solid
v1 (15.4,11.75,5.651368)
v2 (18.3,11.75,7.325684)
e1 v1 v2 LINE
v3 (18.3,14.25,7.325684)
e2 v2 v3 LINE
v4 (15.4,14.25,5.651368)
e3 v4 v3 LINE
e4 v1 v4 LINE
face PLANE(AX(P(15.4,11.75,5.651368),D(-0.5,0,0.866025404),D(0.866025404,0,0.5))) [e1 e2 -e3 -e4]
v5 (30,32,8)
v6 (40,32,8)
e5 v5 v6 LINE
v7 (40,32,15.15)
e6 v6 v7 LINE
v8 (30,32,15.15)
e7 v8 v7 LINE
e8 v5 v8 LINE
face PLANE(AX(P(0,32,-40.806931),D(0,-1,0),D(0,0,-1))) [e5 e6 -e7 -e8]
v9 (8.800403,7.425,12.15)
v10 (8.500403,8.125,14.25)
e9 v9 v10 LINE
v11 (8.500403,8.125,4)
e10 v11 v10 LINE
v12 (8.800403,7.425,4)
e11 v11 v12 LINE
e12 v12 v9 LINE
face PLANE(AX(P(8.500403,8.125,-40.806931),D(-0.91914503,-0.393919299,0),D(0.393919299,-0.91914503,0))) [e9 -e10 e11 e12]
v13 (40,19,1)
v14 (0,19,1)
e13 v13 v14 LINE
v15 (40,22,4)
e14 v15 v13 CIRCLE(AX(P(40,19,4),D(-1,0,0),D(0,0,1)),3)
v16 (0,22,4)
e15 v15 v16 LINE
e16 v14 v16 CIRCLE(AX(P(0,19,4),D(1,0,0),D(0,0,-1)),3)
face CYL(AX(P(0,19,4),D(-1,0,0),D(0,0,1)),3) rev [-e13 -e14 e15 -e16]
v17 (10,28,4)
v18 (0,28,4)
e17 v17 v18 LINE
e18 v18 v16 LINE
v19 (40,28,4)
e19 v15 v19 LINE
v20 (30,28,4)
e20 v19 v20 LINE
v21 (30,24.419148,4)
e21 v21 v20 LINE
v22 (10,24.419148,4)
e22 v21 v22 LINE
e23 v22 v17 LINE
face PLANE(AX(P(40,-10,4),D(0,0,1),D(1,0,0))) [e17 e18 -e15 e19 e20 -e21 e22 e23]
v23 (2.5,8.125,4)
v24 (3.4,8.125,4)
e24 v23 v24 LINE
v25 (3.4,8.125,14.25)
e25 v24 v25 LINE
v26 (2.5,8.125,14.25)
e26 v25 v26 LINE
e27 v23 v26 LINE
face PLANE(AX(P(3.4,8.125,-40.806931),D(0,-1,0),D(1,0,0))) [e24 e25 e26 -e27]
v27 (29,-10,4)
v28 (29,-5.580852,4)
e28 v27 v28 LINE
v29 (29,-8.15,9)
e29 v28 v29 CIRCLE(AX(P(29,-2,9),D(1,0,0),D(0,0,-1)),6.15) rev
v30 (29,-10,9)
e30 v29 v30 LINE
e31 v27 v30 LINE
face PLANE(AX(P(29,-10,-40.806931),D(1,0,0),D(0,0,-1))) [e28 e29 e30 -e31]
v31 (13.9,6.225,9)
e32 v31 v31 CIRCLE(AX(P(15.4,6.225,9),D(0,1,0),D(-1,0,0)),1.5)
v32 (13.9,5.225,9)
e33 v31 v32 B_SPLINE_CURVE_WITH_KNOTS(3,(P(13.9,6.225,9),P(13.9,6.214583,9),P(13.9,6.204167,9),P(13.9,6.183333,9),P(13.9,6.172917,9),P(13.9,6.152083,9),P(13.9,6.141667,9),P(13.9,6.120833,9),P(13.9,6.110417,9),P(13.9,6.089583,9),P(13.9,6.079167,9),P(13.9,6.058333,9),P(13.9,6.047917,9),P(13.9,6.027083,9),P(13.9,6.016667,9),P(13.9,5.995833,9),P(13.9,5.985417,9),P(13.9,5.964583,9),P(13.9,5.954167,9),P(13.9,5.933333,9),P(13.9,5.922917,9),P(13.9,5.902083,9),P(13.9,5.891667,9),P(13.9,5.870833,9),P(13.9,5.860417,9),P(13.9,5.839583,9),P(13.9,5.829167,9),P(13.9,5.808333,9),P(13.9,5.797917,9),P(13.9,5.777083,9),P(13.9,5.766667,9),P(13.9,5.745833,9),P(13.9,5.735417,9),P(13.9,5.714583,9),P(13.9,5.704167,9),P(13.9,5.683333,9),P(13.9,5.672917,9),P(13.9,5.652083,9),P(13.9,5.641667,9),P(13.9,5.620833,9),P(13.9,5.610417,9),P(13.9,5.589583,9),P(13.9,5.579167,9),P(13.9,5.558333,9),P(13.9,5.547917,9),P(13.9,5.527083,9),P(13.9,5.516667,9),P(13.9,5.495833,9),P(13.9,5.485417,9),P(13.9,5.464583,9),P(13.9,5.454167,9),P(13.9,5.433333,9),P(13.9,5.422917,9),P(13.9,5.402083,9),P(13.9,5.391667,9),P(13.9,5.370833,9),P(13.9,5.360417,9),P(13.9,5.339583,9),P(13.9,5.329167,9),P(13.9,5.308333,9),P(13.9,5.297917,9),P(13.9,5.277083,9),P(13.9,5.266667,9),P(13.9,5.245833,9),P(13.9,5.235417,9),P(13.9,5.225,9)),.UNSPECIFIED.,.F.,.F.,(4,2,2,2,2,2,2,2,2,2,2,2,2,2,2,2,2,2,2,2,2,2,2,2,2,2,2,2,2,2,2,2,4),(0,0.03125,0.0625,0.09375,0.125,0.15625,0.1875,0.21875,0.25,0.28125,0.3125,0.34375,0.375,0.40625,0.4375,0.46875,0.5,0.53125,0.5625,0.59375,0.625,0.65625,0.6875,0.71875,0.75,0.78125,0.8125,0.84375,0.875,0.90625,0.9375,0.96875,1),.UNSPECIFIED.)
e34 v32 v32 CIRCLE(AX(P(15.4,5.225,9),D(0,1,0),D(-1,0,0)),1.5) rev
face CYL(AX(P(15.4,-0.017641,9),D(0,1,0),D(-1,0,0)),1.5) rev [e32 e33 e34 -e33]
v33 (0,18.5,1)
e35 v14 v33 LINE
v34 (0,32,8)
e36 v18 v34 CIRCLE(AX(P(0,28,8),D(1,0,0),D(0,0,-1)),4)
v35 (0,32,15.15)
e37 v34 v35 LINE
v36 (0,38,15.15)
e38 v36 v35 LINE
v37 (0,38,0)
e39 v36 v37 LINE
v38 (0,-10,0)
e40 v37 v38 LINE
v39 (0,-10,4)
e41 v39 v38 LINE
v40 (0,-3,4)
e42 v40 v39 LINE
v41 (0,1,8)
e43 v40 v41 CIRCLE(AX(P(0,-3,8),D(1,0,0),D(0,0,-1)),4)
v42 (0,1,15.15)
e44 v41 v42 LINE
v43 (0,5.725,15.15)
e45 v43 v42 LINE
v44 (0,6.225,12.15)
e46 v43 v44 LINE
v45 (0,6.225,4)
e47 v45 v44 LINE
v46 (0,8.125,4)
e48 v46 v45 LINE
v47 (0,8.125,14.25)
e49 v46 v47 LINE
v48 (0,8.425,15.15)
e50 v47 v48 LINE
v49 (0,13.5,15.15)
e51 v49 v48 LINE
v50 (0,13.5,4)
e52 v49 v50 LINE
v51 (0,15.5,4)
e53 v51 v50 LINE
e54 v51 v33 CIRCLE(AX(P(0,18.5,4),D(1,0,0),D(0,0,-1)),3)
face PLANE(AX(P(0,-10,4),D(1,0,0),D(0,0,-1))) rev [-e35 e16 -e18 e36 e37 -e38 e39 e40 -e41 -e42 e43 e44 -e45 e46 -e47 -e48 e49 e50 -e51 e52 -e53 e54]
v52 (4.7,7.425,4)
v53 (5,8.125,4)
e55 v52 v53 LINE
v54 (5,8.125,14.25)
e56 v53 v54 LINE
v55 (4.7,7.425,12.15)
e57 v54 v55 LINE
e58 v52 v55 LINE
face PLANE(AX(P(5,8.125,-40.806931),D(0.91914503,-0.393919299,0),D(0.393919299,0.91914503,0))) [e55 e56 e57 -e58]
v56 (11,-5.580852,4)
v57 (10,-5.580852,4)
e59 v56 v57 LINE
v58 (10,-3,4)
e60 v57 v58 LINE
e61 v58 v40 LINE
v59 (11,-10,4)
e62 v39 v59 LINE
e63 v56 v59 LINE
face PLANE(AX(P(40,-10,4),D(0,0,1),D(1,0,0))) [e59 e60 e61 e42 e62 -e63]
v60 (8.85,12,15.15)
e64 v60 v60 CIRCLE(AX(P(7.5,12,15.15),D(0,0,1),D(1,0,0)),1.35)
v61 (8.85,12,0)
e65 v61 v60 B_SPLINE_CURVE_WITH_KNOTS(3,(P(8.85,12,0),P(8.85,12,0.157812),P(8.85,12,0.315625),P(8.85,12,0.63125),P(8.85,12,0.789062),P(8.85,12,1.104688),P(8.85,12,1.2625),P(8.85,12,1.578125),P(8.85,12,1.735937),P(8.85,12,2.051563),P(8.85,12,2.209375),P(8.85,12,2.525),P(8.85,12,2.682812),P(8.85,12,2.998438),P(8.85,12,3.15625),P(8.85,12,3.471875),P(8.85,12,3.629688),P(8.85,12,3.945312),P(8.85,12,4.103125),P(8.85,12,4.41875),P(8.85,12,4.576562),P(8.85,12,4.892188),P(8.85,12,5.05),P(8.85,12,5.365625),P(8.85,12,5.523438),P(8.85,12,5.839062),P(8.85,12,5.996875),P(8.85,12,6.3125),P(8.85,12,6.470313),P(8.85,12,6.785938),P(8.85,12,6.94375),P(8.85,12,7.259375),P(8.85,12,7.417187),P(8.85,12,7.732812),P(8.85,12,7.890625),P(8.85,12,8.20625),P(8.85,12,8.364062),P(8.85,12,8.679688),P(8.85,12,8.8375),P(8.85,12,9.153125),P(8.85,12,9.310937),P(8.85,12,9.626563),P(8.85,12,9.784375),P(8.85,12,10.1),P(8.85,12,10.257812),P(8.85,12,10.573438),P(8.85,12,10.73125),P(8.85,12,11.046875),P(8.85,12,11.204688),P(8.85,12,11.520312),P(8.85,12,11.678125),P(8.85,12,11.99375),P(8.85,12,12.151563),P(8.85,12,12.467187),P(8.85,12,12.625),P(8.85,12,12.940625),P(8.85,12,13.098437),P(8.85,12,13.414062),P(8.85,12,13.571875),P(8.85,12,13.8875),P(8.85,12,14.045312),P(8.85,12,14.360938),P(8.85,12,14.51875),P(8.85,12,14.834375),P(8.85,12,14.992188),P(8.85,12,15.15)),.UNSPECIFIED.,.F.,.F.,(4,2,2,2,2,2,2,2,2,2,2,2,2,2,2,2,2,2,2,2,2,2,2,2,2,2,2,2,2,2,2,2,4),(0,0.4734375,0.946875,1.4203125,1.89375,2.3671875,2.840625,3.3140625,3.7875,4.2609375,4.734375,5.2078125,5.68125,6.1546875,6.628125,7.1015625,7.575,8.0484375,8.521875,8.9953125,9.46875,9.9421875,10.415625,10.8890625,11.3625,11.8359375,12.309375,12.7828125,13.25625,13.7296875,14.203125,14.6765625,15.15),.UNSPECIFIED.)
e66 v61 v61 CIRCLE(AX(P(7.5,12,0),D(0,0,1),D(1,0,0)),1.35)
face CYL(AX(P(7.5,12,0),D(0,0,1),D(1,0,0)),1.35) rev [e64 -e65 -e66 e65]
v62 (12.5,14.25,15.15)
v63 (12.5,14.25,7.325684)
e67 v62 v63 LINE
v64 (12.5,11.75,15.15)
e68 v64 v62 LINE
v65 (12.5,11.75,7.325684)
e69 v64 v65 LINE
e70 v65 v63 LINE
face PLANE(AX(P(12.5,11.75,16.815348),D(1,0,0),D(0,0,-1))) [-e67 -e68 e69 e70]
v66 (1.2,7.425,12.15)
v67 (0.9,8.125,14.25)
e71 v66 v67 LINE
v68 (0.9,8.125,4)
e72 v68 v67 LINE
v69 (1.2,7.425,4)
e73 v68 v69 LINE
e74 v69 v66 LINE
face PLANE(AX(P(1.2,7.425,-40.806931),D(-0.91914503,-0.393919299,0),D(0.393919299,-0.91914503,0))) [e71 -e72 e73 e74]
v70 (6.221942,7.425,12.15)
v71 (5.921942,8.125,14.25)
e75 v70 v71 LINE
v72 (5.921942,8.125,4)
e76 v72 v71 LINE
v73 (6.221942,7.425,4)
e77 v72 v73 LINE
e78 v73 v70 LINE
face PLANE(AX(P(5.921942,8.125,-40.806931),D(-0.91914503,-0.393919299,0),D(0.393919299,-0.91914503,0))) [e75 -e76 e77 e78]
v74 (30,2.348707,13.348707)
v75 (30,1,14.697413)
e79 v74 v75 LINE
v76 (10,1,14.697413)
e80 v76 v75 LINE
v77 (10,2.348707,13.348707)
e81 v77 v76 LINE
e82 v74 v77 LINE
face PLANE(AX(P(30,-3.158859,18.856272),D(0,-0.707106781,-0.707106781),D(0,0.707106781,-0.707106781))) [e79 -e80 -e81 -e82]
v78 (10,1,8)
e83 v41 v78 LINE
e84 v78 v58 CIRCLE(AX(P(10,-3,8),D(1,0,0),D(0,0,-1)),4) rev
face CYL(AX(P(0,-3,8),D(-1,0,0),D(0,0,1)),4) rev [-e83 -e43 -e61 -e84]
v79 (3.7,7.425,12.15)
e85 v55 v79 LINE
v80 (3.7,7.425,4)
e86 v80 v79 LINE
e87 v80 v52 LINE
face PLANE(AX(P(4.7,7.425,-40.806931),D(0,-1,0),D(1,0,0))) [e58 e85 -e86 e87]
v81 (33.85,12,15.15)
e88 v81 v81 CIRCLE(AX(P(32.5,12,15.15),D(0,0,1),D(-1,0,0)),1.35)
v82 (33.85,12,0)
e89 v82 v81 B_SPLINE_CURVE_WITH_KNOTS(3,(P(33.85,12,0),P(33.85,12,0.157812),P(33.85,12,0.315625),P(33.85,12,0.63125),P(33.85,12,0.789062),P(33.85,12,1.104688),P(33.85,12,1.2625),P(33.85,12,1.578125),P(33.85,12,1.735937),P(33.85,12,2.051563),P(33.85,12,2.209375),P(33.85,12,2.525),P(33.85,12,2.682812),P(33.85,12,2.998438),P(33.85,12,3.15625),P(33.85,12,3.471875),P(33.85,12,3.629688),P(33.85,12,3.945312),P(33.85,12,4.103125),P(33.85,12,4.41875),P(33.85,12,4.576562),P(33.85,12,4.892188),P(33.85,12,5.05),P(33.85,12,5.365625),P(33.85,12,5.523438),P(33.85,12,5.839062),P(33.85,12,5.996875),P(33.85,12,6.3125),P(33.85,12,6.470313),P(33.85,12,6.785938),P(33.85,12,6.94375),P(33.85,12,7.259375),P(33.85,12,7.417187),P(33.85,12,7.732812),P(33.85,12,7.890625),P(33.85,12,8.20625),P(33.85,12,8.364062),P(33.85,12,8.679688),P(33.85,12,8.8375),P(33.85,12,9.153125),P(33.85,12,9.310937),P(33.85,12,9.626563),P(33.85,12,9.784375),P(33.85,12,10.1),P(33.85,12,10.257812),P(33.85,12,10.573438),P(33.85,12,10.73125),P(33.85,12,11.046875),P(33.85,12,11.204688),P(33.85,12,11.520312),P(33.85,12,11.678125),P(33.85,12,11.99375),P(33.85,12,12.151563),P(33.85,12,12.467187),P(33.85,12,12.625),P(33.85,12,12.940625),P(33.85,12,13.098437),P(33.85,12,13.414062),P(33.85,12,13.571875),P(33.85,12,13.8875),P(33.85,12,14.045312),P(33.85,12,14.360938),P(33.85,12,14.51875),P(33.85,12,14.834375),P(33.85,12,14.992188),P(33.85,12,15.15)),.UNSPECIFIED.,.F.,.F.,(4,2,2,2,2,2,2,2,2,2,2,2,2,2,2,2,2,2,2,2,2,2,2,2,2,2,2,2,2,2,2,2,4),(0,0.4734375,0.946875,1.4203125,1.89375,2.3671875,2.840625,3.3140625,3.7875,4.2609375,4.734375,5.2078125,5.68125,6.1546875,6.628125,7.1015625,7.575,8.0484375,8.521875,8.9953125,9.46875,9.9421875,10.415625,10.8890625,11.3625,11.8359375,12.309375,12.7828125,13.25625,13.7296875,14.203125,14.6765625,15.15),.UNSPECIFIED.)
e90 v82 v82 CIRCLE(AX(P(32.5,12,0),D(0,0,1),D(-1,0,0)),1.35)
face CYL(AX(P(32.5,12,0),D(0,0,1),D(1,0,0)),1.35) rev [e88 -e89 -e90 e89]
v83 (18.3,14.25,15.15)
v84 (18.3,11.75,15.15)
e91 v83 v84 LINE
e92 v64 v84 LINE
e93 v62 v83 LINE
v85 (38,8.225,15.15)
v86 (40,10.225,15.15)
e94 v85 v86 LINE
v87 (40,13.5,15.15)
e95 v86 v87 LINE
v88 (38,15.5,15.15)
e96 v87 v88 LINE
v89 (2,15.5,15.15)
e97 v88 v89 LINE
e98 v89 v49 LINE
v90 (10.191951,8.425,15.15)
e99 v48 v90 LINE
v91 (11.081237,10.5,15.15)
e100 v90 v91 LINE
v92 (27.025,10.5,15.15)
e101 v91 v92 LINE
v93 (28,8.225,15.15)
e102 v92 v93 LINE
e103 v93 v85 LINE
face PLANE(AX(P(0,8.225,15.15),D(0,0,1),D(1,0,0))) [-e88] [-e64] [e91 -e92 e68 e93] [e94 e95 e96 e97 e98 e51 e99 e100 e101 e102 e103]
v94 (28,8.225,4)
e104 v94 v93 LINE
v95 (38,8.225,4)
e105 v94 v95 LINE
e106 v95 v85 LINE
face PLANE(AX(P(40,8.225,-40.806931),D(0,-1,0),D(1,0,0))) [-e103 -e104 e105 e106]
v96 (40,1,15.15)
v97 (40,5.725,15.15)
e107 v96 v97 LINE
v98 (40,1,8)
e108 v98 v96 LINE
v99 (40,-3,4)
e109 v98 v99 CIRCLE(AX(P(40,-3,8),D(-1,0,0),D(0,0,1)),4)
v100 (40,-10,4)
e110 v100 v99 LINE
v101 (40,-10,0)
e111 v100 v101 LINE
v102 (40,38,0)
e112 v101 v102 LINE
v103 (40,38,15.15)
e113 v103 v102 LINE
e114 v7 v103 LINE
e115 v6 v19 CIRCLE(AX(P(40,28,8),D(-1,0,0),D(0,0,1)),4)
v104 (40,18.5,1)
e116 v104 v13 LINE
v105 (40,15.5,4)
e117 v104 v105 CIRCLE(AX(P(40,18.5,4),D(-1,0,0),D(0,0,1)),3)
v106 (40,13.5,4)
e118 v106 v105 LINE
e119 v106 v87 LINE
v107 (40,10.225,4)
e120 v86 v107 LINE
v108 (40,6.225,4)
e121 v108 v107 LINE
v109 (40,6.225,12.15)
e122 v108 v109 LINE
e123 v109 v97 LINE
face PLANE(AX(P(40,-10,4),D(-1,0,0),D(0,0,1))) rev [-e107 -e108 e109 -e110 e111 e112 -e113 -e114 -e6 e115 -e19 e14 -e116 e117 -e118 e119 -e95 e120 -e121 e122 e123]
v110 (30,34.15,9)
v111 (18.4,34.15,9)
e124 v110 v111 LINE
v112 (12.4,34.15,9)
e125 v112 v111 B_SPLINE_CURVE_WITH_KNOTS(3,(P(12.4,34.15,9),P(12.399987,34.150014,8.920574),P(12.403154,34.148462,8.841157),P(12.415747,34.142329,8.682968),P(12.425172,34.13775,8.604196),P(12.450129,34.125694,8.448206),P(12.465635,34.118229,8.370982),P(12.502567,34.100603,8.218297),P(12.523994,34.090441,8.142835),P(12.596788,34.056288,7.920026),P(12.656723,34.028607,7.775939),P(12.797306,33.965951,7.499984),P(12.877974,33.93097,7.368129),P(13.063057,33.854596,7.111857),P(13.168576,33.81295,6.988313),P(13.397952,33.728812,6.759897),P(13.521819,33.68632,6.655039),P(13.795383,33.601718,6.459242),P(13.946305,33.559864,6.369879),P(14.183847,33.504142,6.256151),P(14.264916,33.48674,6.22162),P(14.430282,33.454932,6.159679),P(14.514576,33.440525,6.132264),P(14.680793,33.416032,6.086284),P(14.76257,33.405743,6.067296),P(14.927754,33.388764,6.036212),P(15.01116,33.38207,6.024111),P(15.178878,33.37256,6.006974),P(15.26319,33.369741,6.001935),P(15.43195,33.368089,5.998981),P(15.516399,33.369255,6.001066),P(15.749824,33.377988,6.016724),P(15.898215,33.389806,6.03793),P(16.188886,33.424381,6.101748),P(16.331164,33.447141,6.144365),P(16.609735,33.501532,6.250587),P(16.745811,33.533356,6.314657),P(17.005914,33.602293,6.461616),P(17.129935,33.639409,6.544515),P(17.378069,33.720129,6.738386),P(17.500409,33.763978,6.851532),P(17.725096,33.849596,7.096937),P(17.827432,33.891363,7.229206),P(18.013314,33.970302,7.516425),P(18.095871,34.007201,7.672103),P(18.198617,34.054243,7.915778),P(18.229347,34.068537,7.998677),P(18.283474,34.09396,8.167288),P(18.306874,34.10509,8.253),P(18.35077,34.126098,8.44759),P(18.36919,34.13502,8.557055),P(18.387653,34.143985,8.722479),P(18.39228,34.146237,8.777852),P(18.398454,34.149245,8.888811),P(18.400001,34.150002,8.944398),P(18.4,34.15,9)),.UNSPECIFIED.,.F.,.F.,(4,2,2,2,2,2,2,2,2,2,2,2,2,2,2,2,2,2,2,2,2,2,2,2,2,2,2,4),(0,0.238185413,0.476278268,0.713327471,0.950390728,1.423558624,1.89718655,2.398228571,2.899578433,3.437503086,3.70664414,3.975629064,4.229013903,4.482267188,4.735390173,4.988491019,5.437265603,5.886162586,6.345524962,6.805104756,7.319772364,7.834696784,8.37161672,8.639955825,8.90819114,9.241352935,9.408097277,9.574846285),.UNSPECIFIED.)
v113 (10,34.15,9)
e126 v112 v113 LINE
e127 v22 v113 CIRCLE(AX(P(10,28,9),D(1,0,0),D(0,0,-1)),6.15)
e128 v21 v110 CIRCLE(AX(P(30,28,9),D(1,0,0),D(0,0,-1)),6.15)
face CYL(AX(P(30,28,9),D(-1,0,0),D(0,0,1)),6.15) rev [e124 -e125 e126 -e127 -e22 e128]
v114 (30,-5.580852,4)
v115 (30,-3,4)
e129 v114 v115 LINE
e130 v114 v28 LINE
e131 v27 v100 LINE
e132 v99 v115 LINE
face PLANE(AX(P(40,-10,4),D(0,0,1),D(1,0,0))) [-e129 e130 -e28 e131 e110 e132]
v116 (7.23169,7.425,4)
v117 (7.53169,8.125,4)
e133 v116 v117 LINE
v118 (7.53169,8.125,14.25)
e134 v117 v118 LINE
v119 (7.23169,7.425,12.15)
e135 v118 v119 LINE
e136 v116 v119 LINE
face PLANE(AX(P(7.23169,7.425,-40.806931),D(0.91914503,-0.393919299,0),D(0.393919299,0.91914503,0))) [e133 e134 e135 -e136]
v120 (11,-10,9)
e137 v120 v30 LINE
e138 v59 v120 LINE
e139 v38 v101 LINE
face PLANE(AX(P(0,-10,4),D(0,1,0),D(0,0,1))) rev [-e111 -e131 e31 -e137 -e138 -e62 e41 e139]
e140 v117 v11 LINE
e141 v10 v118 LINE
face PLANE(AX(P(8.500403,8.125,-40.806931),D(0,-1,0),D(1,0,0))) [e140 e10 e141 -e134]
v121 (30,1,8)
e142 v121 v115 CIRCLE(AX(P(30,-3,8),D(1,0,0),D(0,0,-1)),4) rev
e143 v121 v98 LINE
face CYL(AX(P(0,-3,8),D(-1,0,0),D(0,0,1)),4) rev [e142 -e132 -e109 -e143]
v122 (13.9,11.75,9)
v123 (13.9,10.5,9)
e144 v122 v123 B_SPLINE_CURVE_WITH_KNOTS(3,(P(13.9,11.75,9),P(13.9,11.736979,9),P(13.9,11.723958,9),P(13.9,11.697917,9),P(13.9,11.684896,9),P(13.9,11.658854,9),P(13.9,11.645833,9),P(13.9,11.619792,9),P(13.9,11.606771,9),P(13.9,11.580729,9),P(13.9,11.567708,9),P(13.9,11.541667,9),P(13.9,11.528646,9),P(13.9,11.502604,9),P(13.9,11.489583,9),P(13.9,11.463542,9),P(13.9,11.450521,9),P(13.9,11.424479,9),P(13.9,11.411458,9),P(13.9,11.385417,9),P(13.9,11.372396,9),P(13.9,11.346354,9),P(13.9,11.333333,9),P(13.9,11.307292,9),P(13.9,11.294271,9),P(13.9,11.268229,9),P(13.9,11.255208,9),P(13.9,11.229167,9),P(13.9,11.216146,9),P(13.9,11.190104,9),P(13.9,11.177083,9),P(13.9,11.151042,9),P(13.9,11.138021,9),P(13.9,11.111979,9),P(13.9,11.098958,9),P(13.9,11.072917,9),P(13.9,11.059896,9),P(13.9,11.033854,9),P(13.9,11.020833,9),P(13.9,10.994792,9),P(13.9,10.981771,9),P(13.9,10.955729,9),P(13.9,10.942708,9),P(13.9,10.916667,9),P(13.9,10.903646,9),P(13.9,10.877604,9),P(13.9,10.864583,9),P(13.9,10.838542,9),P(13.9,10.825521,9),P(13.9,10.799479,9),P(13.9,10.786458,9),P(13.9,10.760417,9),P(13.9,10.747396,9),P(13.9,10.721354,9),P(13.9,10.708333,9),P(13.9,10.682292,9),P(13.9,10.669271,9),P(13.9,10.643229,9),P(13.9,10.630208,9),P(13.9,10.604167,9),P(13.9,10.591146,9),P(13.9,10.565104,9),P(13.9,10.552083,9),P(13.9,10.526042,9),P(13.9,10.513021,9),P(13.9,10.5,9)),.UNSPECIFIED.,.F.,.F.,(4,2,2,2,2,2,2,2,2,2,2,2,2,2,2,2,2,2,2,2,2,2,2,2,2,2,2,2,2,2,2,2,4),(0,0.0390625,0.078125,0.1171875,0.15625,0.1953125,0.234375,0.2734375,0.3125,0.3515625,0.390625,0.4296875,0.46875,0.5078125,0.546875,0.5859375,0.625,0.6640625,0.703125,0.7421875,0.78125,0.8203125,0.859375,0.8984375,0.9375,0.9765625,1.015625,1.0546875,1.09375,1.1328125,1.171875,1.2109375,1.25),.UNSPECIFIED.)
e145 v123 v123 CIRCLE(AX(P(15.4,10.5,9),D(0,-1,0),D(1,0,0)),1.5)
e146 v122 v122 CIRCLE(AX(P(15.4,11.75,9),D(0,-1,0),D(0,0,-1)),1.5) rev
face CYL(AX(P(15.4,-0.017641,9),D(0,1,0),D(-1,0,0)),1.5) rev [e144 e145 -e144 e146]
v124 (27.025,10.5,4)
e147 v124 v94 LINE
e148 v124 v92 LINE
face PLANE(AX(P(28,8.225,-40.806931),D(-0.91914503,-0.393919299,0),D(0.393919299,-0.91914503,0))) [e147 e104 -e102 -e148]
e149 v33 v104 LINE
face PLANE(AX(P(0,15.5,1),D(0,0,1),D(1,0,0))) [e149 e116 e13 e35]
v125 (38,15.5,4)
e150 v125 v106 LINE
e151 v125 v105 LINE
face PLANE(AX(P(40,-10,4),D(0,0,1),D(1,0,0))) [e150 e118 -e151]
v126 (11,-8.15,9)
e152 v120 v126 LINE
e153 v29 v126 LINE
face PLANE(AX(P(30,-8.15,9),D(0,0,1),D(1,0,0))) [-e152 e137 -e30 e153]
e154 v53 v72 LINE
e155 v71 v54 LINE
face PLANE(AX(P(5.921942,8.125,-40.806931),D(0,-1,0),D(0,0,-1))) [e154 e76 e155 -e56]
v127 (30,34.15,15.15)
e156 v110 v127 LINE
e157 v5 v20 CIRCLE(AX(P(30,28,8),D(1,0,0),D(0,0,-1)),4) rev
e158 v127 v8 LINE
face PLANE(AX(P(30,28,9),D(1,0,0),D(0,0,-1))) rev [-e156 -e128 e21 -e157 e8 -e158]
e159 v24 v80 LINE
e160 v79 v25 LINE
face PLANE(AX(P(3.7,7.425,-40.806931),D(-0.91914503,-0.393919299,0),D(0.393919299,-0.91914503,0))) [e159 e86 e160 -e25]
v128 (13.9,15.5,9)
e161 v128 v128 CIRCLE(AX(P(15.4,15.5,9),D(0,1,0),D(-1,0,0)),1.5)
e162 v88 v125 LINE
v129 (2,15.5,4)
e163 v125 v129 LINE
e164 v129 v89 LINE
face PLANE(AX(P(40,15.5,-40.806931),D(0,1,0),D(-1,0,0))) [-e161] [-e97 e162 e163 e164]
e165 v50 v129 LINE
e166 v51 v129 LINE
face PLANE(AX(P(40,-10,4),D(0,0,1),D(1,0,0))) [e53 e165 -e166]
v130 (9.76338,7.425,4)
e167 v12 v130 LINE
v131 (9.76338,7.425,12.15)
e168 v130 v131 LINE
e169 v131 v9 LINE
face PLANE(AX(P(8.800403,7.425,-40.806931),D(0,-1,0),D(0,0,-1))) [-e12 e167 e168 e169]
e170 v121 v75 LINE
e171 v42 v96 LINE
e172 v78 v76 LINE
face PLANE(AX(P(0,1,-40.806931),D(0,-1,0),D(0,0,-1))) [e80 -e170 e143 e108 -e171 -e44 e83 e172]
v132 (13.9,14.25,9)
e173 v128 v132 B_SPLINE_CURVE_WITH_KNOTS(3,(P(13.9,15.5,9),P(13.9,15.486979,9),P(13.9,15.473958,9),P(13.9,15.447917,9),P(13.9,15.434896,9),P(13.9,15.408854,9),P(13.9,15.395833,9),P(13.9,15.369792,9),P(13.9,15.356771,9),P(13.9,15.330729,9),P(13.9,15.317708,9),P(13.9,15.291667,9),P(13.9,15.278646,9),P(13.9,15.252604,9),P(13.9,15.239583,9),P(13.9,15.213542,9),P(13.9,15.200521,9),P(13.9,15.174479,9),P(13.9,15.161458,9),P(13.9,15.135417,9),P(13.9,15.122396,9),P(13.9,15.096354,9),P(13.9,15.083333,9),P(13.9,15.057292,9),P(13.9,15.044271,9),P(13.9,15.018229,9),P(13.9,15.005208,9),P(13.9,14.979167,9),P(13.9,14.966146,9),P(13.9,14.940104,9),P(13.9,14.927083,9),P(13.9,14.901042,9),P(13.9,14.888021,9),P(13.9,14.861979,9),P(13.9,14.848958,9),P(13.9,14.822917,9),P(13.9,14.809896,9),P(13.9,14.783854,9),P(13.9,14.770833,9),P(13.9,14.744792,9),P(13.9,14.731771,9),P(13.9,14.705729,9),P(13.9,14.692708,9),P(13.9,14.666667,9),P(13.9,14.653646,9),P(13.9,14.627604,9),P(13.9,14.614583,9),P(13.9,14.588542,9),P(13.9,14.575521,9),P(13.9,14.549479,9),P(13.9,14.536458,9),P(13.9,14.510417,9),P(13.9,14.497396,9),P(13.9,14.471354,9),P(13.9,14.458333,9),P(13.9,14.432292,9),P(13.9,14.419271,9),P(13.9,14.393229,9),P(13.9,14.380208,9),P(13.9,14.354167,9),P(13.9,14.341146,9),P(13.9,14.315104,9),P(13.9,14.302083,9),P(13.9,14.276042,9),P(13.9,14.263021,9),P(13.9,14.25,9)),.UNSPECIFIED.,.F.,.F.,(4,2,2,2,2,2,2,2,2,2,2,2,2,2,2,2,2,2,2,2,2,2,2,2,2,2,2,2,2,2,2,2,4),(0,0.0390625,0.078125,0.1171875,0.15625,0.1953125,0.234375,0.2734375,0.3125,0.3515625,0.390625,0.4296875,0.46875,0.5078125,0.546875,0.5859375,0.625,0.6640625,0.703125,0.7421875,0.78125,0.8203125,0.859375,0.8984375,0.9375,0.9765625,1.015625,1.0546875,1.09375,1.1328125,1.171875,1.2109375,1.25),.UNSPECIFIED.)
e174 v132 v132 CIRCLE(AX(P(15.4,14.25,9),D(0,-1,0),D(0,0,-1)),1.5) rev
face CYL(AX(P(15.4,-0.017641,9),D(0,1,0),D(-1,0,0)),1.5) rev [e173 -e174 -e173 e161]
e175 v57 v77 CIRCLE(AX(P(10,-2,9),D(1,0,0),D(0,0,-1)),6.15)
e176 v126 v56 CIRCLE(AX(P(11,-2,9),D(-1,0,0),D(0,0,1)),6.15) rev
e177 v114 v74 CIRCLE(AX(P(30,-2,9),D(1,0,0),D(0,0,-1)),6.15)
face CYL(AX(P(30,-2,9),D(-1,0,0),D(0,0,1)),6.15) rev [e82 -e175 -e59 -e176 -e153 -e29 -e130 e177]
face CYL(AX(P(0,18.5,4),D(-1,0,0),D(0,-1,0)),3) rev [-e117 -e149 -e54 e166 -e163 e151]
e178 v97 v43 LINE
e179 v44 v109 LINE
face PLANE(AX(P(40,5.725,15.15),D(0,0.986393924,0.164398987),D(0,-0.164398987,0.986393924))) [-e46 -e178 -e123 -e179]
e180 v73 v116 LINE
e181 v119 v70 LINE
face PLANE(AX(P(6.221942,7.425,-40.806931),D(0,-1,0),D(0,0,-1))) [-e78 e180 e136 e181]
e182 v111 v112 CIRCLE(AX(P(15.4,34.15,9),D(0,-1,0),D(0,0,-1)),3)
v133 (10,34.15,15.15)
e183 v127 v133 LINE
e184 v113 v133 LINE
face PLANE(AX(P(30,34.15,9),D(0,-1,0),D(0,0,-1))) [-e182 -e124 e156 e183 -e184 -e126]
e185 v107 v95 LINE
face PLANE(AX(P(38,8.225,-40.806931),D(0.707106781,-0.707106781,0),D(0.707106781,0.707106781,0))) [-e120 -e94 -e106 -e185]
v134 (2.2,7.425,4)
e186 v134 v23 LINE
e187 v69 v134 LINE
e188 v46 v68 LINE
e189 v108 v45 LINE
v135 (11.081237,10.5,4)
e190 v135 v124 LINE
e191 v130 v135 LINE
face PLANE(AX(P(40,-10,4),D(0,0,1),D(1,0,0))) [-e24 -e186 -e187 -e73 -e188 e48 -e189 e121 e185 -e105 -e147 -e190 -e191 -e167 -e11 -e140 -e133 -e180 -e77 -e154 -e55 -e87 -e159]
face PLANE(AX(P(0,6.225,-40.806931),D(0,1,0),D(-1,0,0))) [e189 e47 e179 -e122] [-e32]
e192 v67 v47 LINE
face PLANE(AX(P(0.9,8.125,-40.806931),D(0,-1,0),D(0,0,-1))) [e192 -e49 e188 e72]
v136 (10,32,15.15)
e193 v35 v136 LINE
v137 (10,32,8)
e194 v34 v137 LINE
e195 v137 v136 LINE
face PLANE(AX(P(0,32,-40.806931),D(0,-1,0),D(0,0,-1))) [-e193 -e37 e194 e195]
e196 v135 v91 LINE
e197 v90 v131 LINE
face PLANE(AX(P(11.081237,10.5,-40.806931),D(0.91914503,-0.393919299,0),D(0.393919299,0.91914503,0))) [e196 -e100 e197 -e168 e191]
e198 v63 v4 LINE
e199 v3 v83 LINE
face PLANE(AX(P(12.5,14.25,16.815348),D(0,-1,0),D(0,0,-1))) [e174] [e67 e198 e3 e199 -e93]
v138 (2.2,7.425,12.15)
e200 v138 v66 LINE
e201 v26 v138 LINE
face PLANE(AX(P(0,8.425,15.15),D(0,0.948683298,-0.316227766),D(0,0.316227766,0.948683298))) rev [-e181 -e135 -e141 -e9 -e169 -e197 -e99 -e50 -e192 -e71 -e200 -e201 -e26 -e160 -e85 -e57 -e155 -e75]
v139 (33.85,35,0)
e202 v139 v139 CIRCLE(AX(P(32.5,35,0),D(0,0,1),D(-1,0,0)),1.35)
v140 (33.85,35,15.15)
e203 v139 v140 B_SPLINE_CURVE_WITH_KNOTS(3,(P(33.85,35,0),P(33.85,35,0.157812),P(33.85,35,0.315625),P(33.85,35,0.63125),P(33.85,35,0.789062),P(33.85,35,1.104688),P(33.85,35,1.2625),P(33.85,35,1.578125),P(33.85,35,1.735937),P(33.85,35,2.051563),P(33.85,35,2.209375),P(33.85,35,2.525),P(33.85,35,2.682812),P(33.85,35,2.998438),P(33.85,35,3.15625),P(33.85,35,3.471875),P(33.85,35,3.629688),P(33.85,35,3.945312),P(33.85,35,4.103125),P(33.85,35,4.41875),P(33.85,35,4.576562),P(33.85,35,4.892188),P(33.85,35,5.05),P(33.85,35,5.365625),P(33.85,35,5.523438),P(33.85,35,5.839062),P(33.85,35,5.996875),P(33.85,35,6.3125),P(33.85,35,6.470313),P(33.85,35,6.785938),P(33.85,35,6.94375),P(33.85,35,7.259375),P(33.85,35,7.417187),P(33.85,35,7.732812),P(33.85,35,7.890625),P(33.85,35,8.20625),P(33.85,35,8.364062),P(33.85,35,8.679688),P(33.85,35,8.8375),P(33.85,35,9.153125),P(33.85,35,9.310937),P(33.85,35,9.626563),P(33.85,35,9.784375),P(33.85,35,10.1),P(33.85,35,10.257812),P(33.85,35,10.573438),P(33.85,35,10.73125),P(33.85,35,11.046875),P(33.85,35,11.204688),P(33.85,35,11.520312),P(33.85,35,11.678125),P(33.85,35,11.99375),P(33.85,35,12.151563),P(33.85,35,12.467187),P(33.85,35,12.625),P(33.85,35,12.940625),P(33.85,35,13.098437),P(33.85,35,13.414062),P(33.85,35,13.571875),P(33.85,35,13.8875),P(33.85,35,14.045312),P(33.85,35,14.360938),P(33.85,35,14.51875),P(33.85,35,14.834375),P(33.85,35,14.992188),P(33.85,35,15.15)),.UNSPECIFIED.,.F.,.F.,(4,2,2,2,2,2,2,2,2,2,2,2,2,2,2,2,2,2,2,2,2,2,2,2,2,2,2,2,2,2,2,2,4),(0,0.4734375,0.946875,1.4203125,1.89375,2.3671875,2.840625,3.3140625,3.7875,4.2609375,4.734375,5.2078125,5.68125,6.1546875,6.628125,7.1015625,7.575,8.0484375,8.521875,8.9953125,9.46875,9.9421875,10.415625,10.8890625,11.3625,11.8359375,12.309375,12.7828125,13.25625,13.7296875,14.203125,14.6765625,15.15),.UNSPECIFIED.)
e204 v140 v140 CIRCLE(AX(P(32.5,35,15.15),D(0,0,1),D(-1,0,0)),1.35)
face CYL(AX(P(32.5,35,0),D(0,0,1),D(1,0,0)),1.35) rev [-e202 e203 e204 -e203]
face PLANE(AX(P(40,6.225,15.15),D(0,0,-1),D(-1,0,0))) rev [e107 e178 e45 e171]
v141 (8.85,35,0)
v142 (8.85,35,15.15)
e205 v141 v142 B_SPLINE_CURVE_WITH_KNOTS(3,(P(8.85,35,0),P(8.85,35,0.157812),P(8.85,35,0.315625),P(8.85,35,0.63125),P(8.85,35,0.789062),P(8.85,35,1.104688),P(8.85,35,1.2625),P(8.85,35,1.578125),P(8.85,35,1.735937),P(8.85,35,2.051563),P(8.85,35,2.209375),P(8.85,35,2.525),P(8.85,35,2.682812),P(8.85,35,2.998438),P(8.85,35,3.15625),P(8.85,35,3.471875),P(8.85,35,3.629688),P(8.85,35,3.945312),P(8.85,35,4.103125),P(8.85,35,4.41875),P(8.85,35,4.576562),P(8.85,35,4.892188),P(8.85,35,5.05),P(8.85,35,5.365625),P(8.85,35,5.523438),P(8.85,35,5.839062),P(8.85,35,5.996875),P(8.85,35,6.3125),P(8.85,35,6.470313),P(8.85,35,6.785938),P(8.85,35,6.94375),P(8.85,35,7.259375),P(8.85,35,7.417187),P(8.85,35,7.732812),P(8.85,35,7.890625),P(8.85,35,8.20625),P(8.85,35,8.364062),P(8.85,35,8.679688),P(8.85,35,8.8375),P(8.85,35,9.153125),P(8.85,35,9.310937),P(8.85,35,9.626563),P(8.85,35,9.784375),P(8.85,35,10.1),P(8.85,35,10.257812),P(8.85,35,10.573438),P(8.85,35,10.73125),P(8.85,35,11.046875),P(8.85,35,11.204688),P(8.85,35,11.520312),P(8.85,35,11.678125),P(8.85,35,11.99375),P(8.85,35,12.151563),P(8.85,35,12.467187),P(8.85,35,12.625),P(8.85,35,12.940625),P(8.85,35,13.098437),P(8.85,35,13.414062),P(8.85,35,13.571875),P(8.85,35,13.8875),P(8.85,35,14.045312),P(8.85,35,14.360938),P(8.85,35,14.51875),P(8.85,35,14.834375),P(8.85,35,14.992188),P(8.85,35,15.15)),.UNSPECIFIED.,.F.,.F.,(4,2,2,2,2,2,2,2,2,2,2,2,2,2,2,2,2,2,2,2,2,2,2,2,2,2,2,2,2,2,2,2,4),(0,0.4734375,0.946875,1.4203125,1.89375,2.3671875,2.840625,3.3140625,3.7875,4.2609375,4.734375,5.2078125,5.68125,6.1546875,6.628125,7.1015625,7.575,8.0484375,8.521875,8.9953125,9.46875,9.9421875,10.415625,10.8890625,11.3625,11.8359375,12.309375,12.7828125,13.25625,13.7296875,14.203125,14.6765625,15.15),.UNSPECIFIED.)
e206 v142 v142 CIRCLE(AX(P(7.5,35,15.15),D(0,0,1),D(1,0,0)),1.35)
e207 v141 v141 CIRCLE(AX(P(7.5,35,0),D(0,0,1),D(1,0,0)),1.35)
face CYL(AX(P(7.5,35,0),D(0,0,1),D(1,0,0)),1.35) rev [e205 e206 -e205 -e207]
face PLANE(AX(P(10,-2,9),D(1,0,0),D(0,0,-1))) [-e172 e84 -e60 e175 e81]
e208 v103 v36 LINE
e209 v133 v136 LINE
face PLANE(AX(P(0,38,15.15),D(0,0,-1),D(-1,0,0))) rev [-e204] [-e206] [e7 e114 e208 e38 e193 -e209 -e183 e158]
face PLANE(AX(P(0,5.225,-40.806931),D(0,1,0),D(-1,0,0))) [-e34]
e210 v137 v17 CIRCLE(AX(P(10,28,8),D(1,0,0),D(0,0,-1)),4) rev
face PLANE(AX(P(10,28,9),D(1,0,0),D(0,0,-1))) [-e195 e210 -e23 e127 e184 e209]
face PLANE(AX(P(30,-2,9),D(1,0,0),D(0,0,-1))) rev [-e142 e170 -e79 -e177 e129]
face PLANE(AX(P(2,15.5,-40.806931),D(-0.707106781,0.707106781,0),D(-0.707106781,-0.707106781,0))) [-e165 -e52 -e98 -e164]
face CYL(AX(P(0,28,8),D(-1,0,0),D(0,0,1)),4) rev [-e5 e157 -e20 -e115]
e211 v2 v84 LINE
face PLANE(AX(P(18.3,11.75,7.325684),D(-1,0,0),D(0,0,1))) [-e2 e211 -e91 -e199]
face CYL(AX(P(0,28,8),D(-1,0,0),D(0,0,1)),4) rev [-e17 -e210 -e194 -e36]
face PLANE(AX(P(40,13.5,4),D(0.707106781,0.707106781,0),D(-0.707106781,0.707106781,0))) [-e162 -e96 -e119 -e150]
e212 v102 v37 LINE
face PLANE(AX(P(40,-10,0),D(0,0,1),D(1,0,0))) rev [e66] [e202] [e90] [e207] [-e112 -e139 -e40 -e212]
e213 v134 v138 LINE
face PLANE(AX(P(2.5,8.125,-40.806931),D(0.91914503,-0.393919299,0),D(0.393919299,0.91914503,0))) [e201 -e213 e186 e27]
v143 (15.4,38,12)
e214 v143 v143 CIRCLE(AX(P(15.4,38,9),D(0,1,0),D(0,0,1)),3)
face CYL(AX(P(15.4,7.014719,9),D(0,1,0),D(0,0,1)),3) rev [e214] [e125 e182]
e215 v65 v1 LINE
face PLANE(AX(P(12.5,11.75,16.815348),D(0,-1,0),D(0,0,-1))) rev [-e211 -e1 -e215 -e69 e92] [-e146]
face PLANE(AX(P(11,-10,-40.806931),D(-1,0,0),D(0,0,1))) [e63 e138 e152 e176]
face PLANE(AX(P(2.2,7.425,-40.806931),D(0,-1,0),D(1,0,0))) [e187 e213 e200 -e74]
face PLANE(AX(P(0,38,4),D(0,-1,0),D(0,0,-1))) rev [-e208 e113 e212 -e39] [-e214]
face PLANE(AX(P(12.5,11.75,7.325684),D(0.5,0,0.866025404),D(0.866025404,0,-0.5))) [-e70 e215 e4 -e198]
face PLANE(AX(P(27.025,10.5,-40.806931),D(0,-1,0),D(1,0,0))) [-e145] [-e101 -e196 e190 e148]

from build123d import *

# Parameters (mm, degrees)
SKETCH1_W                = 40
SKETCH1_H                = 48
BOSS_EXTRUDE1_DEPTH      = 4
BOSS_EXTRUDE2_DEPTH      = 11.15
BOSS_EXTRUDE2_DEPTH_BACK = 4
SKETCH5_W                = 40
SKETCH5_H                = 5.225
SKETCH5_W_2              = 18
SKETCH5_H_2              = 5
SKETCH5_H_3              = 6
FILLET1_R                = 4
SKETCH6_R                = 1.35
CUT_EXTRUDE4_DEPTH       = 58.214705278
CHAMFER2_SIZE            = 2
SKETCH7_W                = 40
SKETCH7_H                = 6.5
CUT_EXTRUDE5_DEPTH       = 3
FILLET2_R                = 3
CHAMFER3_SIZE            = 3
CHAMFER3_SIZE2           = 1
CHAMFER4_SIZE            = 3
CHAMFER4_SIZE2           = 0.5
CUT_EXTRUDE6_DEPTH       = 10
CUT_EXTRUDE6_DEPTH_BACK  = 10
CUT_EXTRUDE8_REACH       = 66.292
SKETCH12_R               = 3
SKETCH13_R               = 1.5
CUT_EXTRUDE10_DEPTH      = 10.275
CUT_EXTRUDE7_DEPTH       = 1.25
CUT_EXTRUDE7_DEPTH_BACK  = 1.25


with BuildPart() as part:
    # Sketch1 → Boss-Extrude1 (new body)
    with BuildSketch(Plane.XY):
        with Locations((20, 14)):
            Rectangle(SKETCH1_W, SKETCH1_H)
    extrude(amount=BOSS_EXTRUDE1_DEPTH)

    # Sketch5 → Boss-Extrude2 (add, two sides: drawn at the far end of the back side and taken through both)
    with BuildSketch(Plane.XY.offset(4).offset(-BOSS_EXTRUDE2_DEPTH_BACK)):
        Polygon((0.9, 8.125), (0, 8.125), (0, 15.5), (40, 15.5), (40, 8.225), (28, 8.225), (27.025, 10.5), (11.081237185, 10.5), (9.763380042, 7.425), (8.800403155, 7.425), (8.500403155, 8.125), (7.531690021, 8.125), (7.231690021, 7.425), (6.221941609, 7.425), (5.921941609, 8.125), (5, 8.125), (4.7, 7.425), (3.7, 7.425), (3.4, 8.125), (2.5, 8.125), (2.2, 7.425), (1.2, 7.425), align=None)
        with Locations((20, 3.6125)):
            Rectangle(SKETCH5_W, SKETCH5_H)
        with Locations((20, -7.5)):
            Rectangle(SKETCH5_W_2, SKETCH5_H_2)
        with Locations((20, 35)):
            Rectangle(SKETCH5_W, SKETCH5_H_3)
    extrude(amount=BOSS_EXTRUDE2_DEPTH + BOSS_EXTRUDE2_DEPTH_BACK)

    # Fillet1
    fillet1_edges = [part.edges().sort_by_distance(p)[0] for p in [
        (20, 1, 4),
        (20, 32, 4),
    ]]
    fillet(fillet1_edges, radius=FILLET1_R)

    # Sketch6 → Cut-Extrude4 (cut, through all)
    with BuildSketch(Plane.XY.offset(15.15)):
        with Locations((7.5, 35)):
            Circle(SKETCH6_R)
        with Locations((7.5, 12)):
            Circle(SKETCH6_R)
        with Locations((32.5, 35)):
            Circle(SKETCH6_R)
        with Locations((32.5, 12)):
            Circle(SKETCH6_R)
    extrude(amount=-CUT_EXTRUDE4_DEPTH, mode=Mode.SUBTRACT)

    # Chamfer2
    chamfer2_edges = [part.edges().sort_by_distance(p)[0] for p in [
        (40, 8.225, 9.575),
        (0, 15.5, 9.575),
        (40, 15.5, 9.575),
    ]]
    chamfer(chamfer2_edges, length=CHAMFER2_SIZE)

    # Sketch7 → Cut-Extrude5 (cut)
    with BuildSketch(Plane.XY.offset(4)):
        with Locations((20, 18.75)):
            Rectangle(SKETCH7_W, SKETCH7_H)
    extrude(amount=-CUT_EXTRUDE5_DEPTH, mode=Mode.SUBTRACT)

    # Fillet2
    fillet2_edges = [part.edges().sort_by_distance(p)[0] for p in [
        (20, 15.5, 1),
        (20, 22, 1),
    ]]
    fillet(fillet2_edges, radius=FILLET2_R - 0.0001)  # a hair under: the kernel refuses the full size

    # Chamfer3
    chamfer3_edges = [part.edges().sort_by_distance(p)[0] for p in [
        (4.2, 7.425, 15.15),
    ]]
    chamfer3_side = [part.faces().sort_by_distance(p)[0] for p in [
        (4.2, 7.425, 9.575),
    ]]
    chamfer(chamfer3_edges, length=CHAMFER3_SIZE, length2=CHAMFER3_SIZE2, reference=chamfer3_side[0])

    # Chamfer4
    chamfer4_edges = [part.edges().sort_by_distance(p)[0] for p in [
        (20, 6.225, 15.15),
    ]]
    chamfer4_side = [part.faces().sort_by_distance(p)[0] for p in [
        (20, 6.225, 9.575),
    ]]
    chamfer(chamfer4_edges, length=CHAMFER4_SIZE, length2=CHAMFER4_SIZE2, reference=chamfer4_side[0])

    # Sketch8 → Cut-Extrude6 (cut, two sides: drawn at the far end of the back side and taken through both)
    with BuildSketch(Plane(origin=(20, 0, 0), x_dir=(0, 0, -1), z_dir=(1, 0, 0)).offset(-CUT_EXTRUDE6_DEPTH_BACK)):
        with BuildLine():
            Line((-9, 34.15), (-18.856272107, 34.15))
            Line((-18.856272107, 34.15), (-18.856272107, 21.85))
            Line((-18.856272107, 21.85), (-9, 21.85))
            ThreePointArc((-9, 21.85), (-2.85, 28), (-9, 34.15))
        make_face()
        with BuildLine():
            Line((-18.856272107, -10.437196649), (-18.856272107, -3.158858698))
            Line((-18.856272107, -3.158858698), (-13.348706704, 2.348706704))
            ThreePointArc((-13.348706704, 2.348706704), (-3.318140875, 0.353503109), (-9, -8.15))
            Line((-9, -8.15), (-9, -10.437196649))
            Line((-9, -10.437196649), (-18.856272107, -10.437196649))
        make_face()
    extrude(amount=CUT_EXTRUDE6_DEPTH + CUT_EXTRUDE6_DEPTH_BACK, mode=Mode.SUBTRACT)

    # Cut-Extrude8: up to this face of the body (flat: up to its plane)
    cut_extrude8_end = Plane(part.part.faces().sort_by_distance((20, 15.5, 9.574944444))[0])
    # Sketch12 → Cut-Extrude8 (cut, up to the picked face)
    with BuildSketch(Plane(origin=(0, 38, 0), x_dir=(1, 0, 0), z_dir=(0, 1, 0)), mode=Mode.PRIVATE) as cut_extrude8_sk1:
        with Locations(Location((15.4, -9, 0), (0, 0, 270))):
            Circle(SKETCH12_R)
    cut_extrude8_tool1 = split(extrude(cut_extrude8_sk1.sketch, amount=-CUT_EXTRUDE8_REACH, mode=Mode.PRIVATE), bisect_by=cut_extrude8_end, keep=Keep.BOTH, mode=Mode.PRIVATE)
    add(cut_extrude8_tool1.solids().sort_by(Axis((15.4, 38, 9), (0, -1, 0)))[0], mode=Mode.SUBTRACT)

    # Sketch13 → Cut-Extrude10 (cut)
    with BuildSketch(Plane(origin=(0, 15.5, 0), x_dir=(1, 0, 0), z_dir=(0, 1, 0))):
        with Locations(Location((15.4, -9, 0), (0, 0, 180))):
            Circle(SKETCH13_R)
    extrude(amount=-CUT_EXTRUDE10_DEPTH, mode=Mode.SUBTRACT)

    # Sketch9 → Cut-Extrude7 (cut, two sides: drawn at the far end of the back side and taken through both)
    with BuildSketch(Plane.XZ.offset(-13).offset(-CUT_EXTRUDE7_DEPTH_BACK)):
        Polygon((12.5, 16.815347994), (18.3, 16.815347994), (18.3, 7.325684219), (15.4, 5.651368439), (12.5, 7.325684219), align=None)
    extrude(amount=CUT_EXTRUDE7_DEPTH + CUT_EXTRUDE7_DEPTH_BACK, mode=Mode.SUBTRACT)


solid = part.part
